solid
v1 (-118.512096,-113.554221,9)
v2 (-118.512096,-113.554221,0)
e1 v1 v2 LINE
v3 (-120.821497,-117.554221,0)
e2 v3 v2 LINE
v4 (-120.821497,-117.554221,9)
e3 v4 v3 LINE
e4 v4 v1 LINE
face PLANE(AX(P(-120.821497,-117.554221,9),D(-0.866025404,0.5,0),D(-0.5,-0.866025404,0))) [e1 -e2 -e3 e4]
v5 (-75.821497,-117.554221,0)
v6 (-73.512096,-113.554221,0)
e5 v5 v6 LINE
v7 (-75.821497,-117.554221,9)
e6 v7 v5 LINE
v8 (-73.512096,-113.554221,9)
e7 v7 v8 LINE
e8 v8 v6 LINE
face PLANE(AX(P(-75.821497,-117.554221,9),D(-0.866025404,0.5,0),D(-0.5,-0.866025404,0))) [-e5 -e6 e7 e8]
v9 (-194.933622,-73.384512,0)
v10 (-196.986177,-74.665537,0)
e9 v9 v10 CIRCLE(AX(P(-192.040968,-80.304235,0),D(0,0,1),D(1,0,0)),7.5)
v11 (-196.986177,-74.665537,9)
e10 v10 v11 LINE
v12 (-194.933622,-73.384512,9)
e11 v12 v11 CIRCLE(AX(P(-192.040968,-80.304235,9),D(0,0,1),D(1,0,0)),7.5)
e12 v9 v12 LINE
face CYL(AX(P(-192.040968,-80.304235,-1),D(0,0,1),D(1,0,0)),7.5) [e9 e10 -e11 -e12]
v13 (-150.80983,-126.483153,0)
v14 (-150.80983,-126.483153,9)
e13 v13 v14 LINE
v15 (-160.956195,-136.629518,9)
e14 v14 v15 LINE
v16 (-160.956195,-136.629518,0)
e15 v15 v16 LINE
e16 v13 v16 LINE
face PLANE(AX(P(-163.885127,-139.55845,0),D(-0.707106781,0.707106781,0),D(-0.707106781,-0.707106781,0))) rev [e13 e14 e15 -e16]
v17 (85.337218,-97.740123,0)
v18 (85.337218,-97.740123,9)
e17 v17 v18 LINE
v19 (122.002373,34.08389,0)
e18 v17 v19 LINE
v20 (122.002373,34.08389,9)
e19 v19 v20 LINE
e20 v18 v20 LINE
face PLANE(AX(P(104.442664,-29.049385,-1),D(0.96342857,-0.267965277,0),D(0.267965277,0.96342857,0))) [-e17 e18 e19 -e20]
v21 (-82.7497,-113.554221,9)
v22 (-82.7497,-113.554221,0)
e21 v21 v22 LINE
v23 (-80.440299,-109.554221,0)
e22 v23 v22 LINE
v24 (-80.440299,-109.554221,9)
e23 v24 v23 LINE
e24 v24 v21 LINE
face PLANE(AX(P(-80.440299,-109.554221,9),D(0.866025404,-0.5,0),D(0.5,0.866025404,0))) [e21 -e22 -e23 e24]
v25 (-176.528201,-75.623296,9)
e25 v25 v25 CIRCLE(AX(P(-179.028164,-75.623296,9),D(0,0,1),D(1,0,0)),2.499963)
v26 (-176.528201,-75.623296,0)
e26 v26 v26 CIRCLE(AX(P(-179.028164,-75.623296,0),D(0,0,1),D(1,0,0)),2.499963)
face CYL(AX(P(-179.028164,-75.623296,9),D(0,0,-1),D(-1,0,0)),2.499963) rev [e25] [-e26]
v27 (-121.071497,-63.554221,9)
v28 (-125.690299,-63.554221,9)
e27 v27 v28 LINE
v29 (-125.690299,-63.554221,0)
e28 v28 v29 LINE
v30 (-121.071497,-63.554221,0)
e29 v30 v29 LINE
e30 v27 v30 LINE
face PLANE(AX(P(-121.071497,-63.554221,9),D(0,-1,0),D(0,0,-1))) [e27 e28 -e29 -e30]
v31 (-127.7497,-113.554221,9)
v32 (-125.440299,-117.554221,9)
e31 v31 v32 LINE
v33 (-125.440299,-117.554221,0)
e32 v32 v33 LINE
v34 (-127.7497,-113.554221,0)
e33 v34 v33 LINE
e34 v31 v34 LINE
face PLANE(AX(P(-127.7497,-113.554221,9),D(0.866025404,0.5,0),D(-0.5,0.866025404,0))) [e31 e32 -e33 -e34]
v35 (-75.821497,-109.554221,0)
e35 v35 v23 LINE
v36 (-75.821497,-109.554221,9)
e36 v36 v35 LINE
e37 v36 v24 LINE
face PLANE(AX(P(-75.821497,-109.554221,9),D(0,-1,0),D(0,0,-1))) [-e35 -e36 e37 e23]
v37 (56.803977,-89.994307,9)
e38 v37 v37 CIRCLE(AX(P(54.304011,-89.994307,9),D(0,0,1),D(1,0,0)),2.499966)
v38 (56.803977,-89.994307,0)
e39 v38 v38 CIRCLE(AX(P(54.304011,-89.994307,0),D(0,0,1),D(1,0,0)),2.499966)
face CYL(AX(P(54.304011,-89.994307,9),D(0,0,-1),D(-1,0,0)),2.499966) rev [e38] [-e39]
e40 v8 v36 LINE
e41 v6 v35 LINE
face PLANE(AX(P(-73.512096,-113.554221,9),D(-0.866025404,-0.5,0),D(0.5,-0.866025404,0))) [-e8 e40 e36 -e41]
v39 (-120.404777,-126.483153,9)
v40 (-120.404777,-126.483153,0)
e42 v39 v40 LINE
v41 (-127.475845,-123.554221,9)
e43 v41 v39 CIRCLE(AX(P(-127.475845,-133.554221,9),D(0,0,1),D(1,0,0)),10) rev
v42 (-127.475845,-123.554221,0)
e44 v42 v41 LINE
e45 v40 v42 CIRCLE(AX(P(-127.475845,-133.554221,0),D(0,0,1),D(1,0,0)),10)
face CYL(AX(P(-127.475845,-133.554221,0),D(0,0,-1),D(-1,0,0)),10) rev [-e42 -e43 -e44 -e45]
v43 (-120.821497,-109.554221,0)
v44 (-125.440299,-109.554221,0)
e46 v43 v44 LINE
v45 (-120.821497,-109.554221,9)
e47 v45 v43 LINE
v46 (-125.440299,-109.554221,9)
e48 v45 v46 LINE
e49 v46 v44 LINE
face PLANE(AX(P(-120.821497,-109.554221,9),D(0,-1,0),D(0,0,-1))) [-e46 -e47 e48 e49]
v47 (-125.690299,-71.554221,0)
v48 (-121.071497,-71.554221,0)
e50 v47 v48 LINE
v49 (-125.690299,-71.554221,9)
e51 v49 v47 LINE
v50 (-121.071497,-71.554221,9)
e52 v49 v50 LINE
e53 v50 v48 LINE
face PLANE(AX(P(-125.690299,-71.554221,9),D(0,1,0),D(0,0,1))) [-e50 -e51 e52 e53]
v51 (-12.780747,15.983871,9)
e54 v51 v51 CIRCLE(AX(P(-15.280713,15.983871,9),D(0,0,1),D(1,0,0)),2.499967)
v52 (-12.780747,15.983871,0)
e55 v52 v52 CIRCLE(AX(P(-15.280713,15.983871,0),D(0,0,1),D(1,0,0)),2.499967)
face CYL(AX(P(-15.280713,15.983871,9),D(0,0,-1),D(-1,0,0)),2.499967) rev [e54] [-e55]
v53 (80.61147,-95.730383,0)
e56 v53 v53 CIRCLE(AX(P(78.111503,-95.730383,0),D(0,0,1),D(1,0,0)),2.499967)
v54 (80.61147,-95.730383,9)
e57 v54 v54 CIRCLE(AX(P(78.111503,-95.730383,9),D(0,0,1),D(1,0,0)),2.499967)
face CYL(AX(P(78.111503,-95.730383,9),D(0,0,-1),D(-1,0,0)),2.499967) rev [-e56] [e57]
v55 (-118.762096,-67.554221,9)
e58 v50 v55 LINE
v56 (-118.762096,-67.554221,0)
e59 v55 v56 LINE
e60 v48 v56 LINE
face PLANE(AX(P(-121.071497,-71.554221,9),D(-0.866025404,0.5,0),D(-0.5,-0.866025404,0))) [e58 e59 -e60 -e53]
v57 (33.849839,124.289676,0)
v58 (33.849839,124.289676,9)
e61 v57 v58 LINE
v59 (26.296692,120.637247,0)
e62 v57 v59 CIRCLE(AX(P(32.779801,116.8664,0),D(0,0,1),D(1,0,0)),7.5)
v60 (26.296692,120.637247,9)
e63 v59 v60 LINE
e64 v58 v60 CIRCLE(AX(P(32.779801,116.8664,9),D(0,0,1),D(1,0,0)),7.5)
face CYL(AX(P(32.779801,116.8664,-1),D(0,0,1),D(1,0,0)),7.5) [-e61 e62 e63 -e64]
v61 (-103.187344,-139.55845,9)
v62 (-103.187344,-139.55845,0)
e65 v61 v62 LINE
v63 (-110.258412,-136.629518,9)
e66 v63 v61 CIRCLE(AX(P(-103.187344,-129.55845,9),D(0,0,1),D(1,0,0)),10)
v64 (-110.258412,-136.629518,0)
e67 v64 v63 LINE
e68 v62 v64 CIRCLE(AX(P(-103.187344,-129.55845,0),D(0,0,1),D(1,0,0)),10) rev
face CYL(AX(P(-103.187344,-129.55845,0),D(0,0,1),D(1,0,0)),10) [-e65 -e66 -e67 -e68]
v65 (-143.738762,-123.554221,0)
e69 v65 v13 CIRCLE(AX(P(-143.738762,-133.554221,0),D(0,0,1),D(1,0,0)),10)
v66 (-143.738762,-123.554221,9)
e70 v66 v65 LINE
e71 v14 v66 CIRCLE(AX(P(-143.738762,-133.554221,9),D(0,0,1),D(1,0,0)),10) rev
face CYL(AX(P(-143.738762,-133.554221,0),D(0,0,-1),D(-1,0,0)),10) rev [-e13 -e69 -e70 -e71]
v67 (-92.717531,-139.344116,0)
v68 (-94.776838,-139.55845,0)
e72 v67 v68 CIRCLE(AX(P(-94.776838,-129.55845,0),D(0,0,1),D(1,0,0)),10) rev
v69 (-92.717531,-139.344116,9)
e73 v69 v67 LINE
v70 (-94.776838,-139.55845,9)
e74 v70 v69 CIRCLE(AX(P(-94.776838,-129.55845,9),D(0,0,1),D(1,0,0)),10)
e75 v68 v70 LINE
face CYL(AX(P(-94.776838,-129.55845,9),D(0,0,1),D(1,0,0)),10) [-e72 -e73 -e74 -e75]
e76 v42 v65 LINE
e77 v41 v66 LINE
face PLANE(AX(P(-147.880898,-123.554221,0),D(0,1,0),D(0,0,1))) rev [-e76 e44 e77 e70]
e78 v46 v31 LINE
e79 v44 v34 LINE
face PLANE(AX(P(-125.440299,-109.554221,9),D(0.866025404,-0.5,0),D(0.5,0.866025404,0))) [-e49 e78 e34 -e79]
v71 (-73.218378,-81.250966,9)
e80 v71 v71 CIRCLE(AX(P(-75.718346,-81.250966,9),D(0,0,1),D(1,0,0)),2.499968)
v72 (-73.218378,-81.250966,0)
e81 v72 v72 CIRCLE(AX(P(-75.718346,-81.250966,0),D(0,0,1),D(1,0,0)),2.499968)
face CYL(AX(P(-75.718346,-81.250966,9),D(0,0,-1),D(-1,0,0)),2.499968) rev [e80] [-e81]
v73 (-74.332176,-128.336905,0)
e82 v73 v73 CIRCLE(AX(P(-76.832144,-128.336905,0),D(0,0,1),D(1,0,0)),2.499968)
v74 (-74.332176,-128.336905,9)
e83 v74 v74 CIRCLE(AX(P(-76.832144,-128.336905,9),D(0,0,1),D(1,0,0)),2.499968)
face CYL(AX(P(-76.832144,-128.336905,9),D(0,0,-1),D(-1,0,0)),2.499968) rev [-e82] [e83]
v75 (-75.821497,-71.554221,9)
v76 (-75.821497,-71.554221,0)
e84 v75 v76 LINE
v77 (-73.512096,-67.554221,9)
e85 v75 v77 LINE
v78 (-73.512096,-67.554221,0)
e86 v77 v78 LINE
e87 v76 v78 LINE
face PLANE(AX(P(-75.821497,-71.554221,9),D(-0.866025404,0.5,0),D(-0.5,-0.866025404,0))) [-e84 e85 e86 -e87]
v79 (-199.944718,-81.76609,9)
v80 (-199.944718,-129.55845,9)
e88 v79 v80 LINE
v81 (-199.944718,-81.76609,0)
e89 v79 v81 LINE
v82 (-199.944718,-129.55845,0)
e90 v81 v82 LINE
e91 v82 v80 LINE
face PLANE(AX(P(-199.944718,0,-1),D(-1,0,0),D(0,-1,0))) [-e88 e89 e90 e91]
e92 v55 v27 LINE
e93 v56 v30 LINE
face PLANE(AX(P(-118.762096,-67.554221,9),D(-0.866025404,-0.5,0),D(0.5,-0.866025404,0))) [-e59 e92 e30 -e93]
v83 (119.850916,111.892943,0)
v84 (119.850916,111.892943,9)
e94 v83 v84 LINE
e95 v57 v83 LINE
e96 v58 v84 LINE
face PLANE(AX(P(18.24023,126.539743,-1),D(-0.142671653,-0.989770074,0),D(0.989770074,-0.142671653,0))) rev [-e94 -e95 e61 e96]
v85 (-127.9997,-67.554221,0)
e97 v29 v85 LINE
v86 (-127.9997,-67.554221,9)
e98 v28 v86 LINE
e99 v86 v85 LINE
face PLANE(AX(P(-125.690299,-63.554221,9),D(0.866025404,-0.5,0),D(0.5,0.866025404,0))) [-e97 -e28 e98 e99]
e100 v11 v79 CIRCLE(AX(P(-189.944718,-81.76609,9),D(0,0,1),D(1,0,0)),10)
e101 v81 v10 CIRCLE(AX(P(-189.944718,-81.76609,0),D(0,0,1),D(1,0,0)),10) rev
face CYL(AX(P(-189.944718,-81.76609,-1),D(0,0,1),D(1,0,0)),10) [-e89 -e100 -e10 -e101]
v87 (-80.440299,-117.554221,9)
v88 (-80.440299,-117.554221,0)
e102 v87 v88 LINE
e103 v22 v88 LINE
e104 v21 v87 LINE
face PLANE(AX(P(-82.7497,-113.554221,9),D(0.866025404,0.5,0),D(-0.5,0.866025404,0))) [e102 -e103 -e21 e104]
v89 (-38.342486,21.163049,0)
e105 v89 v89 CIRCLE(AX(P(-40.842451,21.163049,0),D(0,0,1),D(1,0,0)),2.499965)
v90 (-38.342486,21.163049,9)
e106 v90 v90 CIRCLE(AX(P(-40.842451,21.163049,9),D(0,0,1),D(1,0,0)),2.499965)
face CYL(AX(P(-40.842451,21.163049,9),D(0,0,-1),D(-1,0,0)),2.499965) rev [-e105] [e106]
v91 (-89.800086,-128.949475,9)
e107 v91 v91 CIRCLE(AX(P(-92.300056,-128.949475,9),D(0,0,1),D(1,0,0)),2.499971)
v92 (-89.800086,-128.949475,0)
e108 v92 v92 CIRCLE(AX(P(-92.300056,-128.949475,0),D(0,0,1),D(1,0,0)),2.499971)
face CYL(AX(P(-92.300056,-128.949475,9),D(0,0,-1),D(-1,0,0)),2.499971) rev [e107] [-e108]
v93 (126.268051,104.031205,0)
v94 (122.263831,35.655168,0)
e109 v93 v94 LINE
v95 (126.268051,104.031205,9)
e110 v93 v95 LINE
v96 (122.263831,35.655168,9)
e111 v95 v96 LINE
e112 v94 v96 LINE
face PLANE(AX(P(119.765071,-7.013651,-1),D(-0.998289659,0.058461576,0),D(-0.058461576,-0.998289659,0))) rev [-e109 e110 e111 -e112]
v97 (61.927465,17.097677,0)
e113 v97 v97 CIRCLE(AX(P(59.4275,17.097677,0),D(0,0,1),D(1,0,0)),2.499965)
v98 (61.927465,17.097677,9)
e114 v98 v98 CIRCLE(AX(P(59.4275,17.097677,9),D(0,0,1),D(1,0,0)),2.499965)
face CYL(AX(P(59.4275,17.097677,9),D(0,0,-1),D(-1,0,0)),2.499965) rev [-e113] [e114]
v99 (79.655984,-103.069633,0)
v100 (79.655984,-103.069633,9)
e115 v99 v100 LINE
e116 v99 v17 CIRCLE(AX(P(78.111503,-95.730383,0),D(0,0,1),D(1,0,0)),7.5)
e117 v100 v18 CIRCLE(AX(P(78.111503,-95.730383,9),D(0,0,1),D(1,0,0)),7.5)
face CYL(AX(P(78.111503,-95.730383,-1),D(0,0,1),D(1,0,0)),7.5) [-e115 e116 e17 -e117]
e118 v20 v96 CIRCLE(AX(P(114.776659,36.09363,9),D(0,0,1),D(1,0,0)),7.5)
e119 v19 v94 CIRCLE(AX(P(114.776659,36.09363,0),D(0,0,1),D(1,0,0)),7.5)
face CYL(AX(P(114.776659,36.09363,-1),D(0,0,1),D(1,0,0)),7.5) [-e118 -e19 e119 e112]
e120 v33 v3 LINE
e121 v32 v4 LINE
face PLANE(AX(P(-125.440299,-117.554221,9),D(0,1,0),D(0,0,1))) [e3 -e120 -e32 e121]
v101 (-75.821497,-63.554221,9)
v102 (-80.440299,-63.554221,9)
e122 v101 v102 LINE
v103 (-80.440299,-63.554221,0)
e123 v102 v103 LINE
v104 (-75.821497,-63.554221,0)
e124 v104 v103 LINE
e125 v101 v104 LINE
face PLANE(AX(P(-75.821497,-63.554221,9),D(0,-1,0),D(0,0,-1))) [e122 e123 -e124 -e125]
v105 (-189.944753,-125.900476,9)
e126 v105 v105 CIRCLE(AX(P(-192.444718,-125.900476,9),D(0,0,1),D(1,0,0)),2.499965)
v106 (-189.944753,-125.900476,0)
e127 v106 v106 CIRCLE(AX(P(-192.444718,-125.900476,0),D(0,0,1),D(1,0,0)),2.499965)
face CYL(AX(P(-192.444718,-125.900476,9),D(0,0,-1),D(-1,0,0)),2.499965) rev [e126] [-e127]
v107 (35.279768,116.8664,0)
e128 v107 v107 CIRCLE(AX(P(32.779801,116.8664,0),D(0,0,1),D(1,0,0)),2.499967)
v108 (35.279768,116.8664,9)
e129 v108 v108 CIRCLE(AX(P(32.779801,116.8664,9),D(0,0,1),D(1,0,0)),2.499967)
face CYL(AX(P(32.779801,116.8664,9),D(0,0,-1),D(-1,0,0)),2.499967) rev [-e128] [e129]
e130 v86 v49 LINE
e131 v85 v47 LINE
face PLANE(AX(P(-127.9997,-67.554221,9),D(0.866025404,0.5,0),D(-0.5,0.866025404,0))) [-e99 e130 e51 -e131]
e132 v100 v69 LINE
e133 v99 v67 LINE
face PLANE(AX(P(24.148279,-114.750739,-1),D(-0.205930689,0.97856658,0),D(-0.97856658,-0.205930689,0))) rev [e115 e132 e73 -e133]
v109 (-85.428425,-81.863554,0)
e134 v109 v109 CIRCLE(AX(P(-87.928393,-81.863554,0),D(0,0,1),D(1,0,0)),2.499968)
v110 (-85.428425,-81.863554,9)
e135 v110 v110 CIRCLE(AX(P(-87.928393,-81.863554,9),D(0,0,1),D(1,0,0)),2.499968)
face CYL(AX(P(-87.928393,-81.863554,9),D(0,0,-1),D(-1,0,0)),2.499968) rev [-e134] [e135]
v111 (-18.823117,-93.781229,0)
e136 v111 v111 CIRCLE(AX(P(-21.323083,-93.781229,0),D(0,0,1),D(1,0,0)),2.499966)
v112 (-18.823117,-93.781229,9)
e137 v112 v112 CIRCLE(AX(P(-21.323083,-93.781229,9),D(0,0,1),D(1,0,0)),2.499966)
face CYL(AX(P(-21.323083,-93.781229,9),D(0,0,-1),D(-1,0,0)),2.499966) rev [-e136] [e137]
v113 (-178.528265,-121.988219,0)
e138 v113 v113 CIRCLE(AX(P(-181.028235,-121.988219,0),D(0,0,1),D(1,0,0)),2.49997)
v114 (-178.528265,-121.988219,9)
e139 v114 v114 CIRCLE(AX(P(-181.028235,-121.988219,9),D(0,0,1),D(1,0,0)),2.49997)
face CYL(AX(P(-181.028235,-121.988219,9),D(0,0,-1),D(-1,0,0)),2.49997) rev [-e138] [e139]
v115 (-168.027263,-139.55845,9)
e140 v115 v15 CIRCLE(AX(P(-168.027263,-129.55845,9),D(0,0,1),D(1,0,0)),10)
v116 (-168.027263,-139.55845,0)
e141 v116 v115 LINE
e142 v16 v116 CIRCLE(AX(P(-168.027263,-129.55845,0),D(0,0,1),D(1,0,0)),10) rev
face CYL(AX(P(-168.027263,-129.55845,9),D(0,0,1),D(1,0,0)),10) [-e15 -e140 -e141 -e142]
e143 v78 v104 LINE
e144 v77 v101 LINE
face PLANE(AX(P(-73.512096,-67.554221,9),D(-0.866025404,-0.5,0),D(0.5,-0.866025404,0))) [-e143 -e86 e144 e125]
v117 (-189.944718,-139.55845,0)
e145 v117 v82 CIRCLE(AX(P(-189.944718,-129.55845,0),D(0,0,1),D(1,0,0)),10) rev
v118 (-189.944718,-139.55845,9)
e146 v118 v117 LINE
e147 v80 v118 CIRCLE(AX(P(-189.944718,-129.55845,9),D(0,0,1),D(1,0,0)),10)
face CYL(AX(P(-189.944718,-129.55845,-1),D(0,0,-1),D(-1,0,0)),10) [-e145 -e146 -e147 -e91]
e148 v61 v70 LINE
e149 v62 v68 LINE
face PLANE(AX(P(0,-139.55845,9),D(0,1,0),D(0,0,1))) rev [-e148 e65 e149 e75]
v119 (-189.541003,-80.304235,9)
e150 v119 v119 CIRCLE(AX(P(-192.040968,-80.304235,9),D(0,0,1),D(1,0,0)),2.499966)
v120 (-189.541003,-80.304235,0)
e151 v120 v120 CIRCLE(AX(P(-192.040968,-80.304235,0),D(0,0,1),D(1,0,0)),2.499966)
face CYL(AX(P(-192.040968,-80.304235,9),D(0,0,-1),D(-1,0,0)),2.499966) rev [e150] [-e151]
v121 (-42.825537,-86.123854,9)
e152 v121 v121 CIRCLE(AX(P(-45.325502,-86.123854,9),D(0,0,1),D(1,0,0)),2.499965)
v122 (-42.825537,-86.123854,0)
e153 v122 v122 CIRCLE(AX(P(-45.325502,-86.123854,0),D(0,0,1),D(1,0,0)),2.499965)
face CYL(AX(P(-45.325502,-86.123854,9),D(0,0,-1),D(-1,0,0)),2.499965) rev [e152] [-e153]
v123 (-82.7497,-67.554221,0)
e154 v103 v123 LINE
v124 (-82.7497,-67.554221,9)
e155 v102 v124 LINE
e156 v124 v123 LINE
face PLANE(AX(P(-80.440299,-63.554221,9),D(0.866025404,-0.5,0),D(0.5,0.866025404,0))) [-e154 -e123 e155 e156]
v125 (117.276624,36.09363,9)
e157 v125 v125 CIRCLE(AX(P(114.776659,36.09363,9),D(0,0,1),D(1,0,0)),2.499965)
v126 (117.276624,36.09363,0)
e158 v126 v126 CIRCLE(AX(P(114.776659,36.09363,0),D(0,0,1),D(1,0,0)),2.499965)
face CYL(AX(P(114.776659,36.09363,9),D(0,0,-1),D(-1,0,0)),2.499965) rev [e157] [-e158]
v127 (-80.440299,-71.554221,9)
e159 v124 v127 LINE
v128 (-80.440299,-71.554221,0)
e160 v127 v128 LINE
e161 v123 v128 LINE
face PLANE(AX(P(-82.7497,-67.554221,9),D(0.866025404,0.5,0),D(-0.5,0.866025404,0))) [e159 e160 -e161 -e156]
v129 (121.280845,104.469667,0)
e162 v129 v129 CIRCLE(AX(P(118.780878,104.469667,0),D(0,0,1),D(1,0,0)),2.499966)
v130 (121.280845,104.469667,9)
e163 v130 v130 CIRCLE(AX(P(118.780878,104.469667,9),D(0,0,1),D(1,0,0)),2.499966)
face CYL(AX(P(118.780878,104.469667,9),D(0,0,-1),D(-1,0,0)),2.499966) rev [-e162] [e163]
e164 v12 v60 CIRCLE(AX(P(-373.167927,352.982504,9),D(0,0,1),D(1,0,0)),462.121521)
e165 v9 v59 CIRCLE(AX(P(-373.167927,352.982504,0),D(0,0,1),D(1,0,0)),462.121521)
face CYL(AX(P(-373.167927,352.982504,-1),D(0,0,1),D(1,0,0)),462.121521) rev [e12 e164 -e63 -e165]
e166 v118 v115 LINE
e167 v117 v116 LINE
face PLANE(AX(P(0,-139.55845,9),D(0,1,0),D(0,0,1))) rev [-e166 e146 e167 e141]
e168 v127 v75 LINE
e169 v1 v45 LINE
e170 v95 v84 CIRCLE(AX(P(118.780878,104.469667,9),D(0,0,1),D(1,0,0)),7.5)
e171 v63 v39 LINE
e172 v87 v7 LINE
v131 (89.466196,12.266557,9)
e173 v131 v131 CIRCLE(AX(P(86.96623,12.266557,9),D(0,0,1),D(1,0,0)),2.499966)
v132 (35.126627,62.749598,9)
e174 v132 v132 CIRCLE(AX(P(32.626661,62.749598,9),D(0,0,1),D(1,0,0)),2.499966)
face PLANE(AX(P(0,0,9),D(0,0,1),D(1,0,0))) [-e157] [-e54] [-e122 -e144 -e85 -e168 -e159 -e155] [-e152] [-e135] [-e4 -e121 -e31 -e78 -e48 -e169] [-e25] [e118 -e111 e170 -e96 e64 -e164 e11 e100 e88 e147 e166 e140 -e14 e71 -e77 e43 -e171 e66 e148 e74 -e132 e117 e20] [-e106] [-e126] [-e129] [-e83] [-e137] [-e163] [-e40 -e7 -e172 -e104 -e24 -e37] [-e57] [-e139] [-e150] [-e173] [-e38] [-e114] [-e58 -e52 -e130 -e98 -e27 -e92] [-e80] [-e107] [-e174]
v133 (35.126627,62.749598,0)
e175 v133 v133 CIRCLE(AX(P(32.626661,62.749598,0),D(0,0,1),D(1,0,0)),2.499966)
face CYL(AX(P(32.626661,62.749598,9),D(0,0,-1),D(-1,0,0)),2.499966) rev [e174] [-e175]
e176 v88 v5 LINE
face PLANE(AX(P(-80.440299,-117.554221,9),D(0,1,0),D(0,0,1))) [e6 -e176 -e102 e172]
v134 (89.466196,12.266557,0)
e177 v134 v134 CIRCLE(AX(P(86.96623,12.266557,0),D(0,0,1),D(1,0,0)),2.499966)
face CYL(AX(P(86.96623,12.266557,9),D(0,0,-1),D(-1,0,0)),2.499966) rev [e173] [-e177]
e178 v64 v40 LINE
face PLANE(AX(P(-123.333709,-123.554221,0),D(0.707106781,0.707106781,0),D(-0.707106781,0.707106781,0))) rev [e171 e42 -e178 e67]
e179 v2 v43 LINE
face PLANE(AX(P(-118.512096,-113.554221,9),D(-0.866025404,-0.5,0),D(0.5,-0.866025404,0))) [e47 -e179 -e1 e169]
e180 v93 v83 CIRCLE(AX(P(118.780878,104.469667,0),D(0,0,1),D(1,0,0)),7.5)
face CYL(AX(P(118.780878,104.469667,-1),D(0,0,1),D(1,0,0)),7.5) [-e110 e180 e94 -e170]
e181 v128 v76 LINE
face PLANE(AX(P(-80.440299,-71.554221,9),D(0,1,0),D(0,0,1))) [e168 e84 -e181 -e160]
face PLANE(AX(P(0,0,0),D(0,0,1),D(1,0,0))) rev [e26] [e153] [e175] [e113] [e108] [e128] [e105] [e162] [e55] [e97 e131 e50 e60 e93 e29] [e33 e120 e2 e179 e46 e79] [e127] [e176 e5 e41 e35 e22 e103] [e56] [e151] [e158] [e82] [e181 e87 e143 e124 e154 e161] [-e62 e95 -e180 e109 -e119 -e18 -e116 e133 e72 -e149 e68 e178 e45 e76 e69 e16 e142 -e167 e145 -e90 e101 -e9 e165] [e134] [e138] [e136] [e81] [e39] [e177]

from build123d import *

# Parameters (mm, degrees)
SKETCH2_R           = 2.499965
SKETCH2_R_2         = 2.49997
SKETCH2_R_3         = 2.4999655
SKETCH2_R_4         = 2.499962807
SKETCH2_R_5         = 2.4999705
SKETCH2_R_6         = 2.499967809
SKETCH2_R_7         = 2.499966
SKETCH2_R_8         = 2.4999665
SKETCH2_R_9         = 2.499966488
BOSS_EXTRUDE1_DEPTH = 9
CUT_EXTRUDE1_DEPTH  = 10
CUT_EXTRUDE2_DEPTH  = 244.998875453
SKETCH5_R           = 2.5
CUT_EXTRUDE3_DEPTH  = 244.998875453
CUT_EXTRUDE5_DEPTH  = 10
FILLET1_R           = 10
CUT_EXTRUDE7_DEPTH  = 244.998875453


with BuildPart() as part:
    # Sketch2 → Boss-Extrude1 (new body)
    with BuildSketch(Plane.XY):
        Polygon((-211.70586, -139.55845), (122.983766, -139.55845), (211.70583, 139.558464), (-211.70586, 139.558464), align=None)
        with Locations((-192.444718, -125.900476)):
            Circle(SKETCH2_R, mode=Mode.SUBTRACT)
        with Locations((-181.028235, -121.988219)):
            Circle(SKETCH2_R_2, mode=Mode.SUBTRACT)
        with Locations((-192.0409685, -80.3042345)):
            Circle(SKETCH2_R_3, mode=Mode.SUBTRACT)
        with Locations((-179.0281635, -75.623296193)):
            Circle(SKETCH2_R_4, mode=Mode.SUBTRACT)
        with Locations((-92.3000565, -128.9494755)):
            Circle(SKETCH2_R_5, mode=Mode.SUBTRACT)
        with Locations((-76.832143809, -128.336904809)):
            Circle(SKETCH2_R_6, mode=Mode.SUBTRACT)
        with Locations((-87.928392809, -81.863553809)):
            Circle(SKETCH2_R_6, mode=Mode.SUBTRACT)
        with Locations((-75.718345809, -81.250965809)):
            Circle(SKETCH2_R_6, mode=Mode.SUBTRACT)
        with Locations((-45.325502, -86.123854)):
            Circle(SKETCH2_R, mode=Mode.SUBTRACT)
        with Locations((-21.323083, -93.781229)):
            Circle(SKETCH2_R_7, mode=Mode.SUBTRACT)
        with Locations((54.304011, -89.994307)):
            Circle(SKETCH2_R_7, mode=Mode.SUBTRACT)
        with Locations((78.1115035, -95.7303835)):
            Circle(SKETCH2_R_8, mode=Mode.SUBTRACT)
        with Locations((114.776659, 36.09363)):
            Circle(SKETCH2_R, mode=Mode.SUBTRACT)
        with Locations((86.96623, 12.266557)):
            Circle(SKETCH2_R_7, mode=Mode.SUBTRACT)
        with Locations((59.4275, 17.097677)):
            Circle(SKETCH2_R, mode=Mode.SUBTRACT)
        with Locations((-40.842451, 21.163049)):
            Circle(SKETCH2_R, mode=Mode.SUBTRACT)
        with Locations((-15.2807135, 15.9838705)):
            Circle(SKETCH2_R_8, mode=Mode.SUBTRACT)
        with Locations((32.626661, 62.749598)):
            Circle(SKETCH2_R_7, mode=Mode.SUBTRACT)
        with Locations((118.780878488, 104.469667)):
            Circle(SKETCH2_R_9, mode=Mode.SUBTRACT)
        with Locations((32.7798015, 116.8664005)):
            Circle(SKETCH2_R_8, mode=Mode.SUBTRACT)
    extrude(amount=BOSS_EXTRUDE1_DEPTH)

    # Sketch3 → Cut-Extrude1 (cut)
    with BuildSketch(Plane.XY.offset(9)):
        Polygon((147.113293383, 124.3664005), (73.705987484, -139.55845), (211.70583, -139.55845), (211.70583, 139.558464), (-211.70586, 139.558464), (-211.70586, -139.55845), (-199.944718, -139.55845), (-199.944718, -77.260214262), (29.956914073, 124.3664005), align=None)
    extrude(amount=-CUT_EXTRUDE1_DEPTH, mode=Mode.SUBTRACT)

    # Sketch4 → Cut-Extrude2 (cut, through all)
    with BuildSketch(Plane.XY.offset(9)):
        Polygon((-163.885127, -139.55845), (-147.880898, -123.554221), (-123.333708966, -123.554221), (-107.329479966, -139.55845), align=None)
    extrude(amount=-CUT_EXTRUDE2_DEPTH, mode=Mode.SUBTRACT)

    # Sketch5 → Cut-Extrude3 (cut, through all)
    with BuildSketch(Plane.XY.offset(9)):
        with Locations((-123.130898, -113.554221)):
            Circle(SKETCH5_R)
        with Locations((-78.130898, -113.554221)):
            Circle(SKETCH5_R)
        with Locations((-123.380898, -67.554221)):
            Circle(SKETCH5_R)
        with Locations((-78.130898, -67.554221)):
            Circle(SKETCH5_R)
    extrude(amount=-CUT_EXTRUDE3_DEPTH, mode=Mode.SUBTRACT)

    # Sketch6 → Cut-Extrude5 (cut)
    with BuildSketch(Plane.XY.offset(9)):
        with BuildLine():
            Line((-195.525508542, -73.384512142), (-194.933621691, -73.384512142))
            ThreePointArc((-194.933621691, -73.384512142), (-115.656074248, -30.741284252), (-46.149790694, 26.462307945))
            ThreePointArc((-46.149790694, 26.462307945), (-6.887258575, 71.211725192), (26.296691523, 120.637247226))
            Line((26.296691523, 120.637247226), (26.296691523, 121.156339417))
            Line((26.296691523, 121.156339417), (-195.525508542, -73.384512142))
        make_face()
        Polygon((147.113293383, 35.655168177), (147.113293383, 124.3664005), (122.439403996, 35.655168177), align=None)
        Polygon((-75.287663516, -135.676154132), (-93.736030822, -139.55845), (73.705987484, -139.55845), (83.854883116, -103.069632849), (79.655983667, -103.069632849), align=None)
        with BuildLine():
            Line((79.655983667, -103.069632849), (83.854883116, -103.069632849))
            Line((83.854883116, -103.069632849), (85.337218021, -97.740122205))
            ThreePointArc((85.337218021, -97.740122205), (83.24278011, -101.200301265), (79.655983667, -103.069632849))
        make_face()
        with BuildLine():
            ThreePointArc((-196.986177186, -74.665536862), (-196.011897332, -73.941709513), (-194.933621691, -73.384512142))
            Line((-194.933621691, -73.384512142), (-195.525508542, -73.384512142))
            Line((-195.525508542, -73.384512142), (-196.986177186, -74.665536862))
        make_face()
        Polygon((26.296691523, 124.3664005), (26.296691523, 121.156339417), (27.834592626, 122.505097973), (29.956914073, 124.3664005), align=None)
        with BuildLine():
            Line((27.834592626, 122.505097973), (26.296691523, 121.156339417))
            Line((26.296691523, 121.156339417), (26.296691523, 120.637247226))
            ThreePointArc((26.296691523, 120.637247226), (26.989824424, 121.633597313), (27.834592626, 122.505097973))
        make_face()
        with BuildLine():
            Line((29.956914073, 124.3664005), (27.834592626, 122.505097973))
            ThreePointArc((27.834592626, 122.505097973), (30.137854408, 123.885667952), (32.779801516, 124.3664005))
            Line((32.779801516, 124.3664005), (29.956914073, 124.3664005))
        make_face()
        with BuildLine():
            Line((147.113293383, 124.3664005), (32.779801516, 124.3664005))
            ThreePointArc((32.779801516, 124.3664005), (33.31619378, 124.347194798), (33.849838899, 124.289676055))
            Line((33.849838899, 124.289676055), (119.850915887, 111.892942555))
            ThreePointArc((119.850915887, 111.892942555), (124.449885477, 109.380100764), (126.280878488, 104.469667))
            ThreePointArc((126.280878488, 104.469667), (126.277670913, 104.250342289), (126.268050933, 104.031205177))
            Line((126.268050933, 104.031205177), (122.263831446, 35.655168177))
            Line((122.263831446, 35.655168177), (122.439403996, 35.655168177))
            Line((122.439403996, 35.655168177), (147.113293383, 124.3664005))
        make_face()
        with BuildLine():
            Line((122.002373456, 34.083891063), (122.439403996, 35.655168177))
            Line((122.439403996, 35.655168177), (122.263831446, 35.655168177))
            ThreePointArc((122.263831446, 35.655168177), (122.174935028, 34.862568747), (122.002373456, 34.083891063))
        make_face()
    extrude(amount=-CUT_EXTRUDE5_DEPTH, mode=Mode.SUBTRACT)

    # Fillet1
    # the kernel refuses this fillet: 10 mm, written as the material it adds along each edge
    with BuildSketch(Plane(origin=(-147.880898, -123.554221, 9), x_dir=(1, 0, 0), z_dir=(0, 0, -1)), Plane(origin=(-123.333708966, -123.554221, 9), x_dir=(0.707106781186551, -0.7071067811865441, 0), z_dir=(0, 0, -1))) as fillet1_piece_1:
        with BuildLine():
            CenterArc((FILLET1_R * 0.414213562373, FILLET1_R), FILLET1_R, 225, 45)
            Line((-FILLET1_R * 0.292893218813, FILLET1_R * 0.292893218813), (0, 0))
            Line((0, 0), (FILLET1_R * 0.414213562373, 0))
        make_face()
    extrude(amount=9)
    # the kernel refuses this fillet: 10 mm, written as the material it takes off along each edge
    with BuildSketch(Plane(origin=(-199.944718, -77.260214262, 20.264688934), x_dir=(0, -1, 0), z_dir=(0, 0, -1))) as fillet1_2_piece_1:
        with BuildLine():
            CenterArc((4.505875574, -10), FILLET1_R, 90, 45.239414653)
            Line((-2.5946774, -2.958540814), (0, 0))
            Line((0, 0), (4.505875574, 0))
        make_face()
    extrude(amount=31.529377868, mode=Mode.SUBTRACT)
    with BuildSketch(Plane(origin=(-163.885127, -139.55845, 19.355339059), x_dir=(-1, 0, 0), z_dir=(0, 0, -1)), Plane(origin=(-107.329479966, -139.55845, 19.355339059), x_dir=(-0.707106781186551, 0.7071067811865441, 0), z_dir=(0, 0, -1))) as fillet1_2_piece_2:
        with BuildLine():
            CenterArc((FILLET1_R * 0.414213562373, FILLET1_R), FILLET1_R, 225, 45)
            Line((-FILLET1_R * 0.292893218813, FILLET1_R * 0.292893218813), (0, 0))
            Line((0, 0), (FILLET1_R * 0.414213562373, 0))
        make_face()
    extrude(amount=29.710678119, mode=Mode.SUBTRACT)
    with BuildSketch(Plane(origin=(-93.736030822, -139.55845, 11.602018692), x_dir=(-1, 0, 0), z_dir=(0, 0, -1))) as fillet1_2_piece_3:
        with BuildLine():
            CenterArc((FILLET1_R * 0.104080747675, FILLET1_R), FILLET1_R, 258.116013885, 11.883986115)
            Line((-FILLET1_R * 0.101849941288, FILLET1_R * 0.0214334200765), (0, 0))
            Line((0, 0), (FILLET1_R * 0.104080747675, 0))
        make_face()
    extrude(amount=14.204037384, mode=Mode.SUBTRACT)
    with BuildSketch(Plane(origin=(-199.944718, -139.55845, 34), x_dir=(1, 0, 0), z_dir=(0, 0, -1))) as fillet1_2_piece_4:
        with BuildLine():
            CenterArc((FILLET1_R, -FILLET1_R), FILLET1_R, 90, 90)
            Line((0, -FILLET1_R), (0, 0))
            Line((0, 0), (FILLET1_R, 0))
        make_face()
    extrude(amount=59, mode=Mode.SUBTRACT)

    # Sketch7 → Cut-Extrude7 (cut, through all)
    with BuildSketch(Plane.XY):
        Polygon((-118.512095846, -113.554221), (-120.821496923, -109.554221), (-125.440299077, -109.554221), (-127.749700154, -113.554221), (-125.440299077, -117.554221), (-120.821496923, -117.554221), align=None)
        Polygon((-82.749700154, -113.554221), (-80.440299077, -117.554221), (-75.821496923, -117.554221), (-73.512095846, -113.554221), (-75.821496923, -109.554221), (-80.440299077, -109.554221), align=None)
        Polygon((-80.440299077, -71.554221), (-75.821496923, -71.554221), (-73.512095846, -67.554221), (-75.821496923, -63.554221), (-80.440299077, -63.554221), (-82.749700154, -67.554221), align=None)
        Polygon((-121.071496923, -71.554221), (-118.762095846, -67.554221), (-121.071496923, -63.554221), (-125.690299077, -63.554221), (-127.999700154, -67.554221), (-125.690299077, -71.554221), align=None)
    extrude(amount=CUT_EXTRUDE7_DEPTH, mode=Mode.SUBTRACT)


solid = part.part
